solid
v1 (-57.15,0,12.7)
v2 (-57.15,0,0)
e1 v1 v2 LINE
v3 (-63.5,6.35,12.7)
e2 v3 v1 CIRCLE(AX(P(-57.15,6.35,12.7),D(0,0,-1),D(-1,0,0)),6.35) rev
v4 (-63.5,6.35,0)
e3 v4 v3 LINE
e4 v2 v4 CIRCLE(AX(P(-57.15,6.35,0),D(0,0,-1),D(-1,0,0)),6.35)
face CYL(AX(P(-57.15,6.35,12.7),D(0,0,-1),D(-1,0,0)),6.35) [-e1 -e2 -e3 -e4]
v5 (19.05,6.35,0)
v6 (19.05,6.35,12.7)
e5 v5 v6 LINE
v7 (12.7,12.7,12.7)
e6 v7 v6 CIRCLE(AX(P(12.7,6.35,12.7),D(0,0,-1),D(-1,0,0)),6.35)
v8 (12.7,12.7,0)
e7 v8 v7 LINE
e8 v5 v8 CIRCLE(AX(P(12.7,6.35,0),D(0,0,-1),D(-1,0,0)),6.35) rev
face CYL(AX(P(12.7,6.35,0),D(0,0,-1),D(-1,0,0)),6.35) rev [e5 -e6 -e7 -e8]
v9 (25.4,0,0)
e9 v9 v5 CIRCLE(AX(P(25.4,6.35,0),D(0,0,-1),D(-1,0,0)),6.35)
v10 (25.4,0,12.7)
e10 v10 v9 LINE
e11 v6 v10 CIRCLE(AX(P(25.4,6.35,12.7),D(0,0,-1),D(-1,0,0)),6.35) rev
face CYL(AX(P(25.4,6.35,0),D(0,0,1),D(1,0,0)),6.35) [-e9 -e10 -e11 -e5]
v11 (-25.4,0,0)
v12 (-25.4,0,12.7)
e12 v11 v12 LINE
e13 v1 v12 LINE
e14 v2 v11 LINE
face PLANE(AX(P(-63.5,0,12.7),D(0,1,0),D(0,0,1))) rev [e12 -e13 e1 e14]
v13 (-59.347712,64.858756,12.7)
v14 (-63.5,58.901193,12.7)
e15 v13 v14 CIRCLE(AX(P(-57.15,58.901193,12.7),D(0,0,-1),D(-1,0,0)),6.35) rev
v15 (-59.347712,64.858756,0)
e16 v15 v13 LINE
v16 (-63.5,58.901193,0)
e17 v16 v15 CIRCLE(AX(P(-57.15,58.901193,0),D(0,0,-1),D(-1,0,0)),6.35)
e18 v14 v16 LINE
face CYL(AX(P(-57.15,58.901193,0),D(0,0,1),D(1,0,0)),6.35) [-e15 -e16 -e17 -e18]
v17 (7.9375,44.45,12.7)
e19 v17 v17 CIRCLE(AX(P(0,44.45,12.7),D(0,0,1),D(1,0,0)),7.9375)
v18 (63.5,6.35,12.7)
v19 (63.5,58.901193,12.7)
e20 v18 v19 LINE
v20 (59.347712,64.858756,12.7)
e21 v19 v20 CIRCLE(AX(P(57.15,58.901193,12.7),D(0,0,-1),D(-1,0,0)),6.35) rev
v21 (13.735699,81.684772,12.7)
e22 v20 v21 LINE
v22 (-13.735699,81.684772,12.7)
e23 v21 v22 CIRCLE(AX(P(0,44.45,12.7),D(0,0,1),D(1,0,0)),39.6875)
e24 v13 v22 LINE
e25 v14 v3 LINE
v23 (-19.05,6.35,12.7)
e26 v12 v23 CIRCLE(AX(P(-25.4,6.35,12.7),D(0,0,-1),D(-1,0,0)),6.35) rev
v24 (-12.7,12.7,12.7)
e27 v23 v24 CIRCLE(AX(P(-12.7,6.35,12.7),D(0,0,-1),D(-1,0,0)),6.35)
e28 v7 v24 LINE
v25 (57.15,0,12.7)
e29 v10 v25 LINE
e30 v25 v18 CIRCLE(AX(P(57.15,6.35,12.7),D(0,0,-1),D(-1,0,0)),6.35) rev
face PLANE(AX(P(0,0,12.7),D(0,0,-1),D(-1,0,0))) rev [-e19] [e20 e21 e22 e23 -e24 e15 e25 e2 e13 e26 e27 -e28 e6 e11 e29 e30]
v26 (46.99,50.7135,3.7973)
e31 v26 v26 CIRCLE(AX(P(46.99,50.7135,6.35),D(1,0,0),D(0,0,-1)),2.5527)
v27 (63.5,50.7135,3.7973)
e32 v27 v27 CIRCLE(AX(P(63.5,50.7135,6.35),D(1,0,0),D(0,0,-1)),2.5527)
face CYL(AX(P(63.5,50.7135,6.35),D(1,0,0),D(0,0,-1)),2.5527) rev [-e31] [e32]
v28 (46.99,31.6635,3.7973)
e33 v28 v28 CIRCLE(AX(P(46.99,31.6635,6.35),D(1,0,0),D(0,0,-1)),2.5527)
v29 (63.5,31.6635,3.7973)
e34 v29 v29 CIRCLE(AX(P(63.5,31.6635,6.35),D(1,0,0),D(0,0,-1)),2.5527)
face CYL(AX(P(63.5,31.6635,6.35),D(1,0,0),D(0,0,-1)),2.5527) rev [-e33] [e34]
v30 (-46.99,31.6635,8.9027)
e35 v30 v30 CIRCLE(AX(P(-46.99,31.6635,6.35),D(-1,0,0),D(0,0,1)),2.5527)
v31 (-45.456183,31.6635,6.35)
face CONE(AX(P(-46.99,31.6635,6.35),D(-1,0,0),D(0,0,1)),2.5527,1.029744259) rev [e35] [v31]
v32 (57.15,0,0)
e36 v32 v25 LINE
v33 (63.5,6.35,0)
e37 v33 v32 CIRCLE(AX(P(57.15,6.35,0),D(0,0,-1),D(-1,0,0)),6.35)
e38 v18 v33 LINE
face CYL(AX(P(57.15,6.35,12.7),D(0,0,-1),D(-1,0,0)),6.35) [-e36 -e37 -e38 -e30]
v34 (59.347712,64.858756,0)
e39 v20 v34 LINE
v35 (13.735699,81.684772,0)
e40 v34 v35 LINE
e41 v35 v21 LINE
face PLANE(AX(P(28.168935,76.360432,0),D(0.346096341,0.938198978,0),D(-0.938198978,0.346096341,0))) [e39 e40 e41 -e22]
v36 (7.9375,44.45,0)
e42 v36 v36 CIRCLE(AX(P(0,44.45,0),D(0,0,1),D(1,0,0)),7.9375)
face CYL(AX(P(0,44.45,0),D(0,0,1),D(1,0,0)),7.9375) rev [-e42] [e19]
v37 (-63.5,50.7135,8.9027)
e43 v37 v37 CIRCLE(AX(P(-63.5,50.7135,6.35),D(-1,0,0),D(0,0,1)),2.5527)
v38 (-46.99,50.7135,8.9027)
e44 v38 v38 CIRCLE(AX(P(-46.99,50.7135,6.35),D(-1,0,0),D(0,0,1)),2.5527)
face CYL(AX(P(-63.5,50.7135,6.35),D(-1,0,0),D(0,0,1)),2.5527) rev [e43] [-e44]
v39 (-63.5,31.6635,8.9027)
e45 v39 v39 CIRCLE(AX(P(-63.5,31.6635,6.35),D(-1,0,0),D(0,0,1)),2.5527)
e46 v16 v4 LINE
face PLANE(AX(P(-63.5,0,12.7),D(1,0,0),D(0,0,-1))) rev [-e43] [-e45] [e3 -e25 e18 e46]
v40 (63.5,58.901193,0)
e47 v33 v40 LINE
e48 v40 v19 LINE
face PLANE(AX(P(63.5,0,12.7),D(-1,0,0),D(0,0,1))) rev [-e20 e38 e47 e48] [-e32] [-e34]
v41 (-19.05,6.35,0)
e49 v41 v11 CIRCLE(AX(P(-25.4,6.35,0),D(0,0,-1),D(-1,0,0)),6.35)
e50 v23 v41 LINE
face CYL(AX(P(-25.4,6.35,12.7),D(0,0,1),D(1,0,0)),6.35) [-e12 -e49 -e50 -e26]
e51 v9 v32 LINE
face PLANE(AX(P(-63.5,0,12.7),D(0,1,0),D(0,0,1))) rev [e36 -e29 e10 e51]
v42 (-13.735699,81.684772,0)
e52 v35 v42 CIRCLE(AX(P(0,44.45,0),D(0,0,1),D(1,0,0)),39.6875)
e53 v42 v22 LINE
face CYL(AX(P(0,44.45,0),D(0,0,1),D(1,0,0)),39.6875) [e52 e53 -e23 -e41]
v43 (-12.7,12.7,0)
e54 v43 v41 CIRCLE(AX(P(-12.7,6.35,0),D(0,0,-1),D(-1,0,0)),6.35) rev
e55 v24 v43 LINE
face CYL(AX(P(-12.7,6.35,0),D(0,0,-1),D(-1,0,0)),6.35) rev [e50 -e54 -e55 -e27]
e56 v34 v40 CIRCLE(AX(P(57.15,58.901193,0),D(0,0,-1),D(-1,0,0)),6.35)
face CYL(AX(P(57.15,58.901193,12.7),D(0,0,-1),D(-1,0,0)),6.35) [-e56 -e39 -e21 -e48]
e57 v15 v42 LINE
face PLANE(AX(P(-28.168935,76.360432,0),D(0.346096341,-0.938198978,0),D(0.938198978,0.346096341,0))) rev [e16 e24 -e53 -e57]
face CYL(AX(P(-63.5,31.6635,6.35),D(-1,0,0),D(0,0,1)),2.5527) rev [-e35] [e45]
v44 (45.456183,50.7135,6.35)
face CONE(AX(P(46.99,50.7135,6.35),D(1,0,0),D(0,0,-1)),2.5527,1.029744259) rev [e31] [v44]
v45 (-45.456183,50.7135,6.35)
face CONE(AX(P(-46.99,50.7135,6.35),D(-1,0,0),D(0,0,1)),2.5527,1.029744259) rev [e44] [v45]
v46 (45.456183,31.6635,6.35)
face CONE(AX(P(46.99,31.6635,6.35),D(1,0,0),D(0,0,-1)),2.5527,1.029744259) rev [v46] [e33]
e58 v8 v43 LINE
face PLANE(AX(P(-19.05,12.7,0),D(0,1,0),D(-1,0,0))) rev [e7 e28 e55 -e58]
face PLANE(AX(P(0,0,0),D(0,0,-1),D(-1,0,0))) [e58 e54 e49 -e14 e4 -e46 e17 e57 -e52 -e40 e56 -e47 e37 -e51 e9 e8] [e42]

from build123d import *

# Parameters (mm, degrees)
SKETCH1_W                        = 127
SKETCH1_H                        = 152.4
BOSS_EXTRUDE1_DEPTH              = 12.7
SKETCH2_R                        = 7.9375
CUT_EXTRUDE1_DEPTH               = 166.587741092
F_1_4_20_TAPPED_HOLE1_AT_2_COUNT = 2
F_1_4_20_TAPPED_HOLE1_AT_2_PITCH = 19.05
SKETCH5_W                        = 38.1
SKETCH5_H                        = 12.7
CUT_EXTRUDE2_DEPTH               = 107.172778556
FILLET1_R                        = 6.35


with BuildPart() as part:
    # Sketch1 → Boss-Extrude1 (new body)
    with BuildSketch(Plane.XY):
        with Locations((0, 76.2)):
            Rectangle(SKETCH1_W, SKETCH1_H)
    extrude(amount=BOSS_EXTRUDE1_DEPTH)

    # Sketch2 → Cut-Extrude1 (cut, through all)
    with BuildSketch(Plane.XY.offset(12.7)):
        with BuildLine():
            Line((-63.5, 152.4), (-63.5, 63.327000238))
            Line((-63.5, 63.327000238), (-13.735698541, 81.684771946))
            ThreePointArc((-13.735698541, 81.684771946), (0, 84.1375), (13.735698541, 81.684771946))
            Line((13.735698541, 81.684771946), (63.5, 63.327000238))
            Line((63.5, 63.327000238), (63.5, 152.4))
            Line((63.5, 152.4), (-63.5, 152.4))
        make_face()
        with Locations((0, 44.45)):
            Circle(SKETCH2_R)
    extrude(amount=-CUT_EXTRUDE1_DEPTH, mode=Mode.SUBTRACT)

    # Sketch3 → 1/4-20 Tapped Hole1 (revolve, cut)
    with BuildSketch(Plane(origin=(63.5, 50.713500119, 6.35), x_dir=(0, 0, -1), z_dir=(0, 1, 0))):
        Polygon((0, 0), (0, 18.043816902), (2.5527, 16.51), (2.5527, 0), align=None)
    f_1_4_20_tapped_hole1 = revolve(axis=Axis((69.85, 50.713500119, 6.35), (-1, 0, 0)), mode=Mode.SUBTRACT)

    # 1/4-20 Tapped Hole1 at 2: 1/4-20 Tapped Hole1 ×2
    with Locations(*[(0, -i * F_1_4_20_TAPPED_HOLE1_AT_2_PITCH, 0) for i in range(1, F_1_4_20_TAPPED_HOLE1_AT_2_COUNT)]):
        add(f_1_4_20_tapped_hole1, mode=Mode.SUBTRACT)

    # Mirror1: 1/4-20 Tapped Hole1 across plane
    add(f_1_4_20_tapped_hole1.mirror(Plane(origin=(0, 0, 0), x_dir=(0, 0, 1), z_dir=(1, 0, 0))), mode=Mode.SUBTRACT)

    # Mirror1 copy 1 sketch → Mirror1 copy 1 (revolve, cut)
    with BuildSketch(Plane(origin=(-63.5, 31.663500119, 6.35), x_dir=(0, 0, -1), z_dir=(0, 1, 0))):
        Polygon((0, 0), (0, -18.043816902), (2.5527, -16.51), (2.5527, 0), align=None)
    revolve(axis=Axis((-69.85, 31.663500119, 6.35), (-1, 0, 0)), mode=Mode.SUBTRACT)

    # Sketch5 → Cut-Extrude2 (cut, through all)
    with BuildSketch(Plane.XY.offset(12.7)):
        with Locations((0, 6.35)):
            Rectangle(SKETCH5_W, SKETCH5_H)
    extrude(amount=-CUT_EXTRUDE2_DEPTH, mode=Mode.SUBTRACT)

    # Fillet1
    fillet1_edges = [part.edges().sort_by_distance(p)[0] for p in [
        (-19.05, 12.7, 6.35),
        (19.05, 12.7, 6.35),
        (19.05, 0, 6.35),
        (63.5, 0, 6.35),
        (63.5, 63.327000238, 6.35),
        (-63.5, 0, 6.35),
        (-19.05, 0, 6.35),
        (-63.5, 63.327000238, 6.35),
    ]]
    fillet(fillet1_edges, radius=FILLET1_R - 0.0001)  # a hair under: the kernel refuses the full size


solid = part.part
